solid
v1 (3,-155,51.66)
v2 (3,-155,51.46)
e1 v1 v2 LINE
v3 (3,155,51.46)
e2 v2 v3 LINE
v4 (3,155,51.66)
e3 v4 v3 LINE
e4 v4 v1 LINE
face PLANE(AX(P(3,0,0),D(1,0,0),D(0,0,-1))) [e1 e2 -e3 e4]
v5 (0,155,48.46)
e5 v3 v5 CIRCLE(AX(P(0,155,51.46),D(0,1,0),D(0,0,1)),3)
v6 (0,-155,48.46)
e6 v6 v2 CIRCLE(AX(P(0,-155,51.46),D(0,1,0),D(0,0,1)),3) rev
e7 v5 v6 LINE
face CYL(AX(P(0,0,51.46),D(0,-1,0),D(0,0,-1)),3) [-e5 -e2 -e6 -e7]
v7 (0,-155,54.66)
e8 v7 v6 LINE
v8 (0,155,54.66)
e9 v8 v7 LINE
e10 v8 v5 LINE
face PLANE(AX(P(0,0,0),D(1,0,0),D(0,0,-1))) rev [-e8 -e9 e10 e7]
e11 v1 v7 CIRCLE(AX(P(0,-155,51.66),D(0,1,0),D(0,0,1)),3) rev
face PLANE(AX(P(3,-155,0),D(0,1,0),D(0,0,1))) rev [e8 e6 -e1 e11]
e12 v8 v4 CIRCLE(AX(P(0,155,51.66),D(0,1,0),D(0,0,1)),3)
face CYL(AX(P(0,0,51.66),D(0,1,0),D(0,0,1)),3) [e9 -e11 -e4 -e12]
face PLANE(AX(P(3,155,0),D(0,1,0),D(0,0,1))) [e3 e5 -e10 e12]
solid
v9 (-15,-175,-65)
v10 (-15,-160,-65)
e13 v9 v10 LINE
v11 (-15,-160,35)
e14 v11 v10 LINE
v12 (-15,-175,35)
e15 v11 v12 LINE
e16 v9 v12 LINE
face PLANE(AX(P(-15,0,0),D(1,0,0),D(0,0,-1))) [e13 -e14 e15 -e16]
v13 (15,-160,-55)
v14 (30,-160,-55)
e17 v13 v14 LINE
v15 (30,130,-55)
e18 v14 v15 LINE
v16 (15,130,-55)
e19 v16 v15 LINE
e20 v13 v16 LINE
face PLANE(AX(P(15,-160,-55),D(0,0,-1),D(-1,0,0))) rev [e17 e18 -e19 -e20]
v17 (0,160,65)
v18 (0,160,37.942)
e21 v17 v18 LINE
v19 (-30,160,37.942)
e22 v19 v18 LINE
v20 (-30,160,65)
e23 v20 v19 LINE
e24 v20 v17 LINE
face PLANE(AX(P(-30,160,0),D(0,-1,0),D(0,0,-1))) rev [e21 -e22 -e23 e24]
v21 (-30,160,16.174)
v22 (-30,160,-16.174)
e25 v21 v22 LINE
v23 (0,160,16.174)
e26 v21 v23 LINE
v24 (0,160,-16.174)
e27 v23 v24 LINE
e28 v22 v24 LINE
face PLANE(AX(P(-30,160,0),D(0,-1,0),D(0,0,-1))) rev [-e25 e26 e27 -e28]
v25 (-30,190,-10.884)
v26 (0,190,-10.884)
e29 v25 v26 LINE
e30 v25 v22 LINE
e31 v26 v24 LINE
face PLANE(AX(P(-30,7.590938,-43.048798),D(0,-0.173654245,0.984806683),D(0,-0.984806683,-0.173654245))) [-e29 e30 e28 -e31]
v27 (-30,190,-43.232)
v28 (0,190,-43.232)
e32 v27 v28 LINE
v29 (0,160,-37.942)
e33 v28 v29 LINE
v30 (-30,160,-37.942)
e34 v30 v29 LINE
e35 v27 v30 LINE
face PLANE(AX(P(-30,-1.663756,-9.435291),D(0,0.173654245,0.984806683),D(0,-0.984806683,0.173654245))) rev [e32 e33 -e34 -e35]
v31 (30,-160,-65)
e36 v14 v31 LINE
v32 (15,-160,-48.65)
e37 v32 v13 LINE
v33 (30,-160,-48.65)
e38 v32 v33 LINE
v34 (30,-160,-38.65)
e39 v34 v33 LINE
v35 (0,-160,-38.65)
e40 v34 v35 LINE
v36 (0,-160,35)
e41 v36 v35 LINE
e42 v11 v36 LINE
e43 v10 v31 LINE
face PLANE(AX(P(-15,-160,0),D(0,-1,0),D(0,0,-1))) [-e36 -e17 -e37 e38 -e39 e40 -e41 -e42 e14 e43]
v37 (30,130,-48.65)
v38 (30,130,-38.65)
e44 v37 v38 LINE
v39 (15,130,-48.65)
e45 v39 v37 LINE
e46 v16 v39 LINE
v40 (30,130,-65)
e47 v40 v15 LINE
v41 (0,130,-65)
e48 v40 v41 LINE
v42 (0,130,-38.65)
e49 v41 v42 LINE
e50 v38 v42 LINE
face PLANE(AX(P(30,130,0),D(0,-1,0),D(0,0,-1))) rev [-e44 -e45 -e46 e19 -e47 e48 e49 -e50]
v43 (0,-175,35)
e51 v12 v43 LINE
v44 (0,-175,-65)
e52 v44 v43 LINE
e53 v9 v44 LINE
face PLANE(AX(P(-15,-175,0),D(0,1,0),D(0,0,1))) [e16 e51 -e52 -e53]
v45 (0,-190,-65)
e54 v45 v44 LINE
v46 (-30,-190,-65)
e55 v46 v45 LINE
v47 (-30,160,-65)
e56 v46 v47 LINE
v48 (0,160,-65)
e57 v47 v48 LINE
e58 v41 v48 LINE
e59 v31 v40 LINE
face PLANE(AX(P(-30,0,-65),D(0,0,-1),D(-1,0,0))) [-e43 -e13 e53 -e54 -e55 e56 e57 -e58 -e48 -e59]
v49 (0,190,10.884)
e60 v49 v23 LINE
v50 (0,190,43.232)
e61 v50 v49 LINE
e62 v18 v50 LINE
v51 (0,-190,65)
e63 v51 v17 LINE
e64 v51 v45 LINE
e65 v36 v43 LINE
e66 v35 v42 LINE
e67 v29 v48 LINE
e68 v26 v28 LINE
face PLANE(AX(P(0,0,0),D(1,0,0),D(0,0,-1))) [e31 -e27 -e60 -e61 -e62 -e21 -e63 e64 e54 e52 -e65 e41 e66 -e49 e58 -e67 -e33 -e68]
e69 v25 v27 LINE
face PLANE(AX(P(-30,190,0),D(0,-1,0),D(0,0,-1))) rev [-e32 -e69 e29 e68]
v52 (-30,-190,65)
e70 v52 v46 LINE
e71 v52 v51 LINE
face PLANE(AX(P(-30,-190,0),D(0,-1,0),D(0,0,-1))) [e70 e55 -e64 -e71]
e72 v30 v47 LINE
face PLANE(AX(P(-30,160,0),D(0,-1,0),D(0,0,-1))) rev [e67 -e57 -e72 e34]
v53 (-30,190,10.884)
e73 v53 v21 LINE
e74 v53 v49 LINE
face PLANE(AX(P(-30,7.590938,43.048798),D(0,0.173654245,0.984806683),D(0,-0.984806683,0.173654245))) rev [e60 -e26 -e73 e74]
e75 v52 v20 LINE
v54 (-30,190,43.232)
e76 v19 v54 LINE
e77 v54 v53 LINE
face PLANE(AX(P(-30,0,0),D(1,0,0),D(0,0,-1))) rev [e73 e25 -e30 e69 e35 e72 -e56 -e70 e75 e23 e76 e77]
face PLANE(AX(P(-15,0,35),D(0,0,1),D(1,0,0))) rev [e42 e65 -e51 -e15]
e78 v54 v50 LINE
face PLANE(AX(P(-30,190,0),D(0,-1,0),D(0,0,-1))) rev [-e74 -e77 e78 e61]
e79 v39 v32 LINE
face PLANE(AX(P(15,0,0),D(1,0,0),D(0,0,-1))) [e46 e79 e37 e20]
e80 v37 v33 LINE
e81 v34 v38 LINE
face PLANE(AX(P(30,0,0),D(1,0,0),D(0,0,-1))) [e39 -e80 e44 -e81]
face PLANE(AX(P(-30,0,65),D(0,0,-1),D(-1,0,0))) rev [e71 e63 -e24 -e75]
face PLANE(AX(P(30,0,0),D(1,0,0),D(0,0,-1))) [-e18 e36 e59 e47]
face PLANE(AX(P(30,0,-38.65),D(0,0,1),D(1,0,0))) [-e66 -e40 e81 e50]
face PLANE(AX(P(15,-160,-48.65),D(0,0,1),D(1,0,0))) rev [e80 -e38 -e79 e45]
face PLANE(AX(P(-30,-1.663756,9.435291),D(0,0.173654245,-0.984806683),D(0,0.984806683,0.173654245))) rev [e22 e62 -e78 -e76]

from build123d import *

# Parameters (mm, degrees)
BOSS_EXTRUDE2_DEPTH = 30
SKETCH1_3_W         = 6.2
SKETCH1_3_H         = 310
BOSS_EXTRUDE3_DEPTH = 3
FILLET2_R           = 3
CUT_EXTRUDE1_DEPTH  = 15
SKETCH1_7_W         = 26.35
SKETCH1_7_H         = 290
BOSS_EXTRUDE6_DEPTH = 30
SKETCH4_W           = 6.35
SKETCH4_H           = 290
CUT_EXTRUDE4_DEPTH  = 15


with BuildPart() as part:
    # Sketch1 → Boss-Extrude2 (new body)
    with BuildSketch(Plane(origin=(0, 0, 0), x_dir=(0, 0, -1), z_dir=(1, 0, 0))):
        Polygon((-37.942, 160), (-65, 160), (-65, -190), (65, -190), (65, 160), (37.942, 160), (43.232, 190), (10.884, 190), (16.174, 160), (-16.174, 160), (-10.884, 190), (-43.232, 190), align=None)
    extrude(amount=-BOSS_EXTRUDE2_DEPTH)

    # Sketch1<5> → Cut-Extrude1 (cut)
    with BuildSketch(Plane(origin=(0, 0, 0), x_dir=(0, 0, -1), z_dir=(1, 0, 0))):
        Polygon((38.65, -160), (-35, -160), (-35, -175), (65, -175), (65, -160), align=None)
    extrude(amount=-CUT_EXTRUDE1_DEPTH, mode=Mode.SUBTRACT)

    # Sketch1<7> → Boss-Extrude6 (add)
    with BuildSketch(Plane(origin=(0, 0, 0), x_dir=(0, 0, -1), z_dir=(1, 0, 0))):
        with Locations((51.825, -15)):
            Rectangle(SKETCH1_7_W, SKETCH1_7_H)
    extrude(amount=BOSS_EXTRUDE6_DEPTH)

    # Sketch4 → Cut-Extrude4 (cut)
    with BuildSketch(Plane(origin=(30, 0, 0), x_dir=(0, 0, -1), z_dir=(1, 0, 0))):
        with Locations((51.825, -15)):
            Rectangle(SKETCH4_W, SKETCH4_H)
    extrude(amount=-CUT_EXTRUDE4_DEPTH, mode=Mode.SUBTRACT)


with BuildPart() as body_2:
    # Sketch1<3> → Boss-Extrude3 (new body)
    with BuildSketch(Plane(origin=(0, 0, 0), x_dir=(0, 0, -1), z_dir=(1, 0, 0))):
        with Locations((-51.56, 0)):
            Rectangle(SKETCH1_3_W, SKETCH1_3_H)
    extrude(amount=BOSS_EXTRUDE3_DEPTH)

    # Fillet2
    fillet2_edges = [body_2.edges().sort_by_distance(p)[0] for p in [
        (3, 0, 48.46),
        (3, 0, 54.66),
    ]]
    fillet(fillet2_edges, radius=FILLET2_R - 0.0001)  # a hair under: the kernel refuses the full size


solid = Compound([part.part, body_2.part])
